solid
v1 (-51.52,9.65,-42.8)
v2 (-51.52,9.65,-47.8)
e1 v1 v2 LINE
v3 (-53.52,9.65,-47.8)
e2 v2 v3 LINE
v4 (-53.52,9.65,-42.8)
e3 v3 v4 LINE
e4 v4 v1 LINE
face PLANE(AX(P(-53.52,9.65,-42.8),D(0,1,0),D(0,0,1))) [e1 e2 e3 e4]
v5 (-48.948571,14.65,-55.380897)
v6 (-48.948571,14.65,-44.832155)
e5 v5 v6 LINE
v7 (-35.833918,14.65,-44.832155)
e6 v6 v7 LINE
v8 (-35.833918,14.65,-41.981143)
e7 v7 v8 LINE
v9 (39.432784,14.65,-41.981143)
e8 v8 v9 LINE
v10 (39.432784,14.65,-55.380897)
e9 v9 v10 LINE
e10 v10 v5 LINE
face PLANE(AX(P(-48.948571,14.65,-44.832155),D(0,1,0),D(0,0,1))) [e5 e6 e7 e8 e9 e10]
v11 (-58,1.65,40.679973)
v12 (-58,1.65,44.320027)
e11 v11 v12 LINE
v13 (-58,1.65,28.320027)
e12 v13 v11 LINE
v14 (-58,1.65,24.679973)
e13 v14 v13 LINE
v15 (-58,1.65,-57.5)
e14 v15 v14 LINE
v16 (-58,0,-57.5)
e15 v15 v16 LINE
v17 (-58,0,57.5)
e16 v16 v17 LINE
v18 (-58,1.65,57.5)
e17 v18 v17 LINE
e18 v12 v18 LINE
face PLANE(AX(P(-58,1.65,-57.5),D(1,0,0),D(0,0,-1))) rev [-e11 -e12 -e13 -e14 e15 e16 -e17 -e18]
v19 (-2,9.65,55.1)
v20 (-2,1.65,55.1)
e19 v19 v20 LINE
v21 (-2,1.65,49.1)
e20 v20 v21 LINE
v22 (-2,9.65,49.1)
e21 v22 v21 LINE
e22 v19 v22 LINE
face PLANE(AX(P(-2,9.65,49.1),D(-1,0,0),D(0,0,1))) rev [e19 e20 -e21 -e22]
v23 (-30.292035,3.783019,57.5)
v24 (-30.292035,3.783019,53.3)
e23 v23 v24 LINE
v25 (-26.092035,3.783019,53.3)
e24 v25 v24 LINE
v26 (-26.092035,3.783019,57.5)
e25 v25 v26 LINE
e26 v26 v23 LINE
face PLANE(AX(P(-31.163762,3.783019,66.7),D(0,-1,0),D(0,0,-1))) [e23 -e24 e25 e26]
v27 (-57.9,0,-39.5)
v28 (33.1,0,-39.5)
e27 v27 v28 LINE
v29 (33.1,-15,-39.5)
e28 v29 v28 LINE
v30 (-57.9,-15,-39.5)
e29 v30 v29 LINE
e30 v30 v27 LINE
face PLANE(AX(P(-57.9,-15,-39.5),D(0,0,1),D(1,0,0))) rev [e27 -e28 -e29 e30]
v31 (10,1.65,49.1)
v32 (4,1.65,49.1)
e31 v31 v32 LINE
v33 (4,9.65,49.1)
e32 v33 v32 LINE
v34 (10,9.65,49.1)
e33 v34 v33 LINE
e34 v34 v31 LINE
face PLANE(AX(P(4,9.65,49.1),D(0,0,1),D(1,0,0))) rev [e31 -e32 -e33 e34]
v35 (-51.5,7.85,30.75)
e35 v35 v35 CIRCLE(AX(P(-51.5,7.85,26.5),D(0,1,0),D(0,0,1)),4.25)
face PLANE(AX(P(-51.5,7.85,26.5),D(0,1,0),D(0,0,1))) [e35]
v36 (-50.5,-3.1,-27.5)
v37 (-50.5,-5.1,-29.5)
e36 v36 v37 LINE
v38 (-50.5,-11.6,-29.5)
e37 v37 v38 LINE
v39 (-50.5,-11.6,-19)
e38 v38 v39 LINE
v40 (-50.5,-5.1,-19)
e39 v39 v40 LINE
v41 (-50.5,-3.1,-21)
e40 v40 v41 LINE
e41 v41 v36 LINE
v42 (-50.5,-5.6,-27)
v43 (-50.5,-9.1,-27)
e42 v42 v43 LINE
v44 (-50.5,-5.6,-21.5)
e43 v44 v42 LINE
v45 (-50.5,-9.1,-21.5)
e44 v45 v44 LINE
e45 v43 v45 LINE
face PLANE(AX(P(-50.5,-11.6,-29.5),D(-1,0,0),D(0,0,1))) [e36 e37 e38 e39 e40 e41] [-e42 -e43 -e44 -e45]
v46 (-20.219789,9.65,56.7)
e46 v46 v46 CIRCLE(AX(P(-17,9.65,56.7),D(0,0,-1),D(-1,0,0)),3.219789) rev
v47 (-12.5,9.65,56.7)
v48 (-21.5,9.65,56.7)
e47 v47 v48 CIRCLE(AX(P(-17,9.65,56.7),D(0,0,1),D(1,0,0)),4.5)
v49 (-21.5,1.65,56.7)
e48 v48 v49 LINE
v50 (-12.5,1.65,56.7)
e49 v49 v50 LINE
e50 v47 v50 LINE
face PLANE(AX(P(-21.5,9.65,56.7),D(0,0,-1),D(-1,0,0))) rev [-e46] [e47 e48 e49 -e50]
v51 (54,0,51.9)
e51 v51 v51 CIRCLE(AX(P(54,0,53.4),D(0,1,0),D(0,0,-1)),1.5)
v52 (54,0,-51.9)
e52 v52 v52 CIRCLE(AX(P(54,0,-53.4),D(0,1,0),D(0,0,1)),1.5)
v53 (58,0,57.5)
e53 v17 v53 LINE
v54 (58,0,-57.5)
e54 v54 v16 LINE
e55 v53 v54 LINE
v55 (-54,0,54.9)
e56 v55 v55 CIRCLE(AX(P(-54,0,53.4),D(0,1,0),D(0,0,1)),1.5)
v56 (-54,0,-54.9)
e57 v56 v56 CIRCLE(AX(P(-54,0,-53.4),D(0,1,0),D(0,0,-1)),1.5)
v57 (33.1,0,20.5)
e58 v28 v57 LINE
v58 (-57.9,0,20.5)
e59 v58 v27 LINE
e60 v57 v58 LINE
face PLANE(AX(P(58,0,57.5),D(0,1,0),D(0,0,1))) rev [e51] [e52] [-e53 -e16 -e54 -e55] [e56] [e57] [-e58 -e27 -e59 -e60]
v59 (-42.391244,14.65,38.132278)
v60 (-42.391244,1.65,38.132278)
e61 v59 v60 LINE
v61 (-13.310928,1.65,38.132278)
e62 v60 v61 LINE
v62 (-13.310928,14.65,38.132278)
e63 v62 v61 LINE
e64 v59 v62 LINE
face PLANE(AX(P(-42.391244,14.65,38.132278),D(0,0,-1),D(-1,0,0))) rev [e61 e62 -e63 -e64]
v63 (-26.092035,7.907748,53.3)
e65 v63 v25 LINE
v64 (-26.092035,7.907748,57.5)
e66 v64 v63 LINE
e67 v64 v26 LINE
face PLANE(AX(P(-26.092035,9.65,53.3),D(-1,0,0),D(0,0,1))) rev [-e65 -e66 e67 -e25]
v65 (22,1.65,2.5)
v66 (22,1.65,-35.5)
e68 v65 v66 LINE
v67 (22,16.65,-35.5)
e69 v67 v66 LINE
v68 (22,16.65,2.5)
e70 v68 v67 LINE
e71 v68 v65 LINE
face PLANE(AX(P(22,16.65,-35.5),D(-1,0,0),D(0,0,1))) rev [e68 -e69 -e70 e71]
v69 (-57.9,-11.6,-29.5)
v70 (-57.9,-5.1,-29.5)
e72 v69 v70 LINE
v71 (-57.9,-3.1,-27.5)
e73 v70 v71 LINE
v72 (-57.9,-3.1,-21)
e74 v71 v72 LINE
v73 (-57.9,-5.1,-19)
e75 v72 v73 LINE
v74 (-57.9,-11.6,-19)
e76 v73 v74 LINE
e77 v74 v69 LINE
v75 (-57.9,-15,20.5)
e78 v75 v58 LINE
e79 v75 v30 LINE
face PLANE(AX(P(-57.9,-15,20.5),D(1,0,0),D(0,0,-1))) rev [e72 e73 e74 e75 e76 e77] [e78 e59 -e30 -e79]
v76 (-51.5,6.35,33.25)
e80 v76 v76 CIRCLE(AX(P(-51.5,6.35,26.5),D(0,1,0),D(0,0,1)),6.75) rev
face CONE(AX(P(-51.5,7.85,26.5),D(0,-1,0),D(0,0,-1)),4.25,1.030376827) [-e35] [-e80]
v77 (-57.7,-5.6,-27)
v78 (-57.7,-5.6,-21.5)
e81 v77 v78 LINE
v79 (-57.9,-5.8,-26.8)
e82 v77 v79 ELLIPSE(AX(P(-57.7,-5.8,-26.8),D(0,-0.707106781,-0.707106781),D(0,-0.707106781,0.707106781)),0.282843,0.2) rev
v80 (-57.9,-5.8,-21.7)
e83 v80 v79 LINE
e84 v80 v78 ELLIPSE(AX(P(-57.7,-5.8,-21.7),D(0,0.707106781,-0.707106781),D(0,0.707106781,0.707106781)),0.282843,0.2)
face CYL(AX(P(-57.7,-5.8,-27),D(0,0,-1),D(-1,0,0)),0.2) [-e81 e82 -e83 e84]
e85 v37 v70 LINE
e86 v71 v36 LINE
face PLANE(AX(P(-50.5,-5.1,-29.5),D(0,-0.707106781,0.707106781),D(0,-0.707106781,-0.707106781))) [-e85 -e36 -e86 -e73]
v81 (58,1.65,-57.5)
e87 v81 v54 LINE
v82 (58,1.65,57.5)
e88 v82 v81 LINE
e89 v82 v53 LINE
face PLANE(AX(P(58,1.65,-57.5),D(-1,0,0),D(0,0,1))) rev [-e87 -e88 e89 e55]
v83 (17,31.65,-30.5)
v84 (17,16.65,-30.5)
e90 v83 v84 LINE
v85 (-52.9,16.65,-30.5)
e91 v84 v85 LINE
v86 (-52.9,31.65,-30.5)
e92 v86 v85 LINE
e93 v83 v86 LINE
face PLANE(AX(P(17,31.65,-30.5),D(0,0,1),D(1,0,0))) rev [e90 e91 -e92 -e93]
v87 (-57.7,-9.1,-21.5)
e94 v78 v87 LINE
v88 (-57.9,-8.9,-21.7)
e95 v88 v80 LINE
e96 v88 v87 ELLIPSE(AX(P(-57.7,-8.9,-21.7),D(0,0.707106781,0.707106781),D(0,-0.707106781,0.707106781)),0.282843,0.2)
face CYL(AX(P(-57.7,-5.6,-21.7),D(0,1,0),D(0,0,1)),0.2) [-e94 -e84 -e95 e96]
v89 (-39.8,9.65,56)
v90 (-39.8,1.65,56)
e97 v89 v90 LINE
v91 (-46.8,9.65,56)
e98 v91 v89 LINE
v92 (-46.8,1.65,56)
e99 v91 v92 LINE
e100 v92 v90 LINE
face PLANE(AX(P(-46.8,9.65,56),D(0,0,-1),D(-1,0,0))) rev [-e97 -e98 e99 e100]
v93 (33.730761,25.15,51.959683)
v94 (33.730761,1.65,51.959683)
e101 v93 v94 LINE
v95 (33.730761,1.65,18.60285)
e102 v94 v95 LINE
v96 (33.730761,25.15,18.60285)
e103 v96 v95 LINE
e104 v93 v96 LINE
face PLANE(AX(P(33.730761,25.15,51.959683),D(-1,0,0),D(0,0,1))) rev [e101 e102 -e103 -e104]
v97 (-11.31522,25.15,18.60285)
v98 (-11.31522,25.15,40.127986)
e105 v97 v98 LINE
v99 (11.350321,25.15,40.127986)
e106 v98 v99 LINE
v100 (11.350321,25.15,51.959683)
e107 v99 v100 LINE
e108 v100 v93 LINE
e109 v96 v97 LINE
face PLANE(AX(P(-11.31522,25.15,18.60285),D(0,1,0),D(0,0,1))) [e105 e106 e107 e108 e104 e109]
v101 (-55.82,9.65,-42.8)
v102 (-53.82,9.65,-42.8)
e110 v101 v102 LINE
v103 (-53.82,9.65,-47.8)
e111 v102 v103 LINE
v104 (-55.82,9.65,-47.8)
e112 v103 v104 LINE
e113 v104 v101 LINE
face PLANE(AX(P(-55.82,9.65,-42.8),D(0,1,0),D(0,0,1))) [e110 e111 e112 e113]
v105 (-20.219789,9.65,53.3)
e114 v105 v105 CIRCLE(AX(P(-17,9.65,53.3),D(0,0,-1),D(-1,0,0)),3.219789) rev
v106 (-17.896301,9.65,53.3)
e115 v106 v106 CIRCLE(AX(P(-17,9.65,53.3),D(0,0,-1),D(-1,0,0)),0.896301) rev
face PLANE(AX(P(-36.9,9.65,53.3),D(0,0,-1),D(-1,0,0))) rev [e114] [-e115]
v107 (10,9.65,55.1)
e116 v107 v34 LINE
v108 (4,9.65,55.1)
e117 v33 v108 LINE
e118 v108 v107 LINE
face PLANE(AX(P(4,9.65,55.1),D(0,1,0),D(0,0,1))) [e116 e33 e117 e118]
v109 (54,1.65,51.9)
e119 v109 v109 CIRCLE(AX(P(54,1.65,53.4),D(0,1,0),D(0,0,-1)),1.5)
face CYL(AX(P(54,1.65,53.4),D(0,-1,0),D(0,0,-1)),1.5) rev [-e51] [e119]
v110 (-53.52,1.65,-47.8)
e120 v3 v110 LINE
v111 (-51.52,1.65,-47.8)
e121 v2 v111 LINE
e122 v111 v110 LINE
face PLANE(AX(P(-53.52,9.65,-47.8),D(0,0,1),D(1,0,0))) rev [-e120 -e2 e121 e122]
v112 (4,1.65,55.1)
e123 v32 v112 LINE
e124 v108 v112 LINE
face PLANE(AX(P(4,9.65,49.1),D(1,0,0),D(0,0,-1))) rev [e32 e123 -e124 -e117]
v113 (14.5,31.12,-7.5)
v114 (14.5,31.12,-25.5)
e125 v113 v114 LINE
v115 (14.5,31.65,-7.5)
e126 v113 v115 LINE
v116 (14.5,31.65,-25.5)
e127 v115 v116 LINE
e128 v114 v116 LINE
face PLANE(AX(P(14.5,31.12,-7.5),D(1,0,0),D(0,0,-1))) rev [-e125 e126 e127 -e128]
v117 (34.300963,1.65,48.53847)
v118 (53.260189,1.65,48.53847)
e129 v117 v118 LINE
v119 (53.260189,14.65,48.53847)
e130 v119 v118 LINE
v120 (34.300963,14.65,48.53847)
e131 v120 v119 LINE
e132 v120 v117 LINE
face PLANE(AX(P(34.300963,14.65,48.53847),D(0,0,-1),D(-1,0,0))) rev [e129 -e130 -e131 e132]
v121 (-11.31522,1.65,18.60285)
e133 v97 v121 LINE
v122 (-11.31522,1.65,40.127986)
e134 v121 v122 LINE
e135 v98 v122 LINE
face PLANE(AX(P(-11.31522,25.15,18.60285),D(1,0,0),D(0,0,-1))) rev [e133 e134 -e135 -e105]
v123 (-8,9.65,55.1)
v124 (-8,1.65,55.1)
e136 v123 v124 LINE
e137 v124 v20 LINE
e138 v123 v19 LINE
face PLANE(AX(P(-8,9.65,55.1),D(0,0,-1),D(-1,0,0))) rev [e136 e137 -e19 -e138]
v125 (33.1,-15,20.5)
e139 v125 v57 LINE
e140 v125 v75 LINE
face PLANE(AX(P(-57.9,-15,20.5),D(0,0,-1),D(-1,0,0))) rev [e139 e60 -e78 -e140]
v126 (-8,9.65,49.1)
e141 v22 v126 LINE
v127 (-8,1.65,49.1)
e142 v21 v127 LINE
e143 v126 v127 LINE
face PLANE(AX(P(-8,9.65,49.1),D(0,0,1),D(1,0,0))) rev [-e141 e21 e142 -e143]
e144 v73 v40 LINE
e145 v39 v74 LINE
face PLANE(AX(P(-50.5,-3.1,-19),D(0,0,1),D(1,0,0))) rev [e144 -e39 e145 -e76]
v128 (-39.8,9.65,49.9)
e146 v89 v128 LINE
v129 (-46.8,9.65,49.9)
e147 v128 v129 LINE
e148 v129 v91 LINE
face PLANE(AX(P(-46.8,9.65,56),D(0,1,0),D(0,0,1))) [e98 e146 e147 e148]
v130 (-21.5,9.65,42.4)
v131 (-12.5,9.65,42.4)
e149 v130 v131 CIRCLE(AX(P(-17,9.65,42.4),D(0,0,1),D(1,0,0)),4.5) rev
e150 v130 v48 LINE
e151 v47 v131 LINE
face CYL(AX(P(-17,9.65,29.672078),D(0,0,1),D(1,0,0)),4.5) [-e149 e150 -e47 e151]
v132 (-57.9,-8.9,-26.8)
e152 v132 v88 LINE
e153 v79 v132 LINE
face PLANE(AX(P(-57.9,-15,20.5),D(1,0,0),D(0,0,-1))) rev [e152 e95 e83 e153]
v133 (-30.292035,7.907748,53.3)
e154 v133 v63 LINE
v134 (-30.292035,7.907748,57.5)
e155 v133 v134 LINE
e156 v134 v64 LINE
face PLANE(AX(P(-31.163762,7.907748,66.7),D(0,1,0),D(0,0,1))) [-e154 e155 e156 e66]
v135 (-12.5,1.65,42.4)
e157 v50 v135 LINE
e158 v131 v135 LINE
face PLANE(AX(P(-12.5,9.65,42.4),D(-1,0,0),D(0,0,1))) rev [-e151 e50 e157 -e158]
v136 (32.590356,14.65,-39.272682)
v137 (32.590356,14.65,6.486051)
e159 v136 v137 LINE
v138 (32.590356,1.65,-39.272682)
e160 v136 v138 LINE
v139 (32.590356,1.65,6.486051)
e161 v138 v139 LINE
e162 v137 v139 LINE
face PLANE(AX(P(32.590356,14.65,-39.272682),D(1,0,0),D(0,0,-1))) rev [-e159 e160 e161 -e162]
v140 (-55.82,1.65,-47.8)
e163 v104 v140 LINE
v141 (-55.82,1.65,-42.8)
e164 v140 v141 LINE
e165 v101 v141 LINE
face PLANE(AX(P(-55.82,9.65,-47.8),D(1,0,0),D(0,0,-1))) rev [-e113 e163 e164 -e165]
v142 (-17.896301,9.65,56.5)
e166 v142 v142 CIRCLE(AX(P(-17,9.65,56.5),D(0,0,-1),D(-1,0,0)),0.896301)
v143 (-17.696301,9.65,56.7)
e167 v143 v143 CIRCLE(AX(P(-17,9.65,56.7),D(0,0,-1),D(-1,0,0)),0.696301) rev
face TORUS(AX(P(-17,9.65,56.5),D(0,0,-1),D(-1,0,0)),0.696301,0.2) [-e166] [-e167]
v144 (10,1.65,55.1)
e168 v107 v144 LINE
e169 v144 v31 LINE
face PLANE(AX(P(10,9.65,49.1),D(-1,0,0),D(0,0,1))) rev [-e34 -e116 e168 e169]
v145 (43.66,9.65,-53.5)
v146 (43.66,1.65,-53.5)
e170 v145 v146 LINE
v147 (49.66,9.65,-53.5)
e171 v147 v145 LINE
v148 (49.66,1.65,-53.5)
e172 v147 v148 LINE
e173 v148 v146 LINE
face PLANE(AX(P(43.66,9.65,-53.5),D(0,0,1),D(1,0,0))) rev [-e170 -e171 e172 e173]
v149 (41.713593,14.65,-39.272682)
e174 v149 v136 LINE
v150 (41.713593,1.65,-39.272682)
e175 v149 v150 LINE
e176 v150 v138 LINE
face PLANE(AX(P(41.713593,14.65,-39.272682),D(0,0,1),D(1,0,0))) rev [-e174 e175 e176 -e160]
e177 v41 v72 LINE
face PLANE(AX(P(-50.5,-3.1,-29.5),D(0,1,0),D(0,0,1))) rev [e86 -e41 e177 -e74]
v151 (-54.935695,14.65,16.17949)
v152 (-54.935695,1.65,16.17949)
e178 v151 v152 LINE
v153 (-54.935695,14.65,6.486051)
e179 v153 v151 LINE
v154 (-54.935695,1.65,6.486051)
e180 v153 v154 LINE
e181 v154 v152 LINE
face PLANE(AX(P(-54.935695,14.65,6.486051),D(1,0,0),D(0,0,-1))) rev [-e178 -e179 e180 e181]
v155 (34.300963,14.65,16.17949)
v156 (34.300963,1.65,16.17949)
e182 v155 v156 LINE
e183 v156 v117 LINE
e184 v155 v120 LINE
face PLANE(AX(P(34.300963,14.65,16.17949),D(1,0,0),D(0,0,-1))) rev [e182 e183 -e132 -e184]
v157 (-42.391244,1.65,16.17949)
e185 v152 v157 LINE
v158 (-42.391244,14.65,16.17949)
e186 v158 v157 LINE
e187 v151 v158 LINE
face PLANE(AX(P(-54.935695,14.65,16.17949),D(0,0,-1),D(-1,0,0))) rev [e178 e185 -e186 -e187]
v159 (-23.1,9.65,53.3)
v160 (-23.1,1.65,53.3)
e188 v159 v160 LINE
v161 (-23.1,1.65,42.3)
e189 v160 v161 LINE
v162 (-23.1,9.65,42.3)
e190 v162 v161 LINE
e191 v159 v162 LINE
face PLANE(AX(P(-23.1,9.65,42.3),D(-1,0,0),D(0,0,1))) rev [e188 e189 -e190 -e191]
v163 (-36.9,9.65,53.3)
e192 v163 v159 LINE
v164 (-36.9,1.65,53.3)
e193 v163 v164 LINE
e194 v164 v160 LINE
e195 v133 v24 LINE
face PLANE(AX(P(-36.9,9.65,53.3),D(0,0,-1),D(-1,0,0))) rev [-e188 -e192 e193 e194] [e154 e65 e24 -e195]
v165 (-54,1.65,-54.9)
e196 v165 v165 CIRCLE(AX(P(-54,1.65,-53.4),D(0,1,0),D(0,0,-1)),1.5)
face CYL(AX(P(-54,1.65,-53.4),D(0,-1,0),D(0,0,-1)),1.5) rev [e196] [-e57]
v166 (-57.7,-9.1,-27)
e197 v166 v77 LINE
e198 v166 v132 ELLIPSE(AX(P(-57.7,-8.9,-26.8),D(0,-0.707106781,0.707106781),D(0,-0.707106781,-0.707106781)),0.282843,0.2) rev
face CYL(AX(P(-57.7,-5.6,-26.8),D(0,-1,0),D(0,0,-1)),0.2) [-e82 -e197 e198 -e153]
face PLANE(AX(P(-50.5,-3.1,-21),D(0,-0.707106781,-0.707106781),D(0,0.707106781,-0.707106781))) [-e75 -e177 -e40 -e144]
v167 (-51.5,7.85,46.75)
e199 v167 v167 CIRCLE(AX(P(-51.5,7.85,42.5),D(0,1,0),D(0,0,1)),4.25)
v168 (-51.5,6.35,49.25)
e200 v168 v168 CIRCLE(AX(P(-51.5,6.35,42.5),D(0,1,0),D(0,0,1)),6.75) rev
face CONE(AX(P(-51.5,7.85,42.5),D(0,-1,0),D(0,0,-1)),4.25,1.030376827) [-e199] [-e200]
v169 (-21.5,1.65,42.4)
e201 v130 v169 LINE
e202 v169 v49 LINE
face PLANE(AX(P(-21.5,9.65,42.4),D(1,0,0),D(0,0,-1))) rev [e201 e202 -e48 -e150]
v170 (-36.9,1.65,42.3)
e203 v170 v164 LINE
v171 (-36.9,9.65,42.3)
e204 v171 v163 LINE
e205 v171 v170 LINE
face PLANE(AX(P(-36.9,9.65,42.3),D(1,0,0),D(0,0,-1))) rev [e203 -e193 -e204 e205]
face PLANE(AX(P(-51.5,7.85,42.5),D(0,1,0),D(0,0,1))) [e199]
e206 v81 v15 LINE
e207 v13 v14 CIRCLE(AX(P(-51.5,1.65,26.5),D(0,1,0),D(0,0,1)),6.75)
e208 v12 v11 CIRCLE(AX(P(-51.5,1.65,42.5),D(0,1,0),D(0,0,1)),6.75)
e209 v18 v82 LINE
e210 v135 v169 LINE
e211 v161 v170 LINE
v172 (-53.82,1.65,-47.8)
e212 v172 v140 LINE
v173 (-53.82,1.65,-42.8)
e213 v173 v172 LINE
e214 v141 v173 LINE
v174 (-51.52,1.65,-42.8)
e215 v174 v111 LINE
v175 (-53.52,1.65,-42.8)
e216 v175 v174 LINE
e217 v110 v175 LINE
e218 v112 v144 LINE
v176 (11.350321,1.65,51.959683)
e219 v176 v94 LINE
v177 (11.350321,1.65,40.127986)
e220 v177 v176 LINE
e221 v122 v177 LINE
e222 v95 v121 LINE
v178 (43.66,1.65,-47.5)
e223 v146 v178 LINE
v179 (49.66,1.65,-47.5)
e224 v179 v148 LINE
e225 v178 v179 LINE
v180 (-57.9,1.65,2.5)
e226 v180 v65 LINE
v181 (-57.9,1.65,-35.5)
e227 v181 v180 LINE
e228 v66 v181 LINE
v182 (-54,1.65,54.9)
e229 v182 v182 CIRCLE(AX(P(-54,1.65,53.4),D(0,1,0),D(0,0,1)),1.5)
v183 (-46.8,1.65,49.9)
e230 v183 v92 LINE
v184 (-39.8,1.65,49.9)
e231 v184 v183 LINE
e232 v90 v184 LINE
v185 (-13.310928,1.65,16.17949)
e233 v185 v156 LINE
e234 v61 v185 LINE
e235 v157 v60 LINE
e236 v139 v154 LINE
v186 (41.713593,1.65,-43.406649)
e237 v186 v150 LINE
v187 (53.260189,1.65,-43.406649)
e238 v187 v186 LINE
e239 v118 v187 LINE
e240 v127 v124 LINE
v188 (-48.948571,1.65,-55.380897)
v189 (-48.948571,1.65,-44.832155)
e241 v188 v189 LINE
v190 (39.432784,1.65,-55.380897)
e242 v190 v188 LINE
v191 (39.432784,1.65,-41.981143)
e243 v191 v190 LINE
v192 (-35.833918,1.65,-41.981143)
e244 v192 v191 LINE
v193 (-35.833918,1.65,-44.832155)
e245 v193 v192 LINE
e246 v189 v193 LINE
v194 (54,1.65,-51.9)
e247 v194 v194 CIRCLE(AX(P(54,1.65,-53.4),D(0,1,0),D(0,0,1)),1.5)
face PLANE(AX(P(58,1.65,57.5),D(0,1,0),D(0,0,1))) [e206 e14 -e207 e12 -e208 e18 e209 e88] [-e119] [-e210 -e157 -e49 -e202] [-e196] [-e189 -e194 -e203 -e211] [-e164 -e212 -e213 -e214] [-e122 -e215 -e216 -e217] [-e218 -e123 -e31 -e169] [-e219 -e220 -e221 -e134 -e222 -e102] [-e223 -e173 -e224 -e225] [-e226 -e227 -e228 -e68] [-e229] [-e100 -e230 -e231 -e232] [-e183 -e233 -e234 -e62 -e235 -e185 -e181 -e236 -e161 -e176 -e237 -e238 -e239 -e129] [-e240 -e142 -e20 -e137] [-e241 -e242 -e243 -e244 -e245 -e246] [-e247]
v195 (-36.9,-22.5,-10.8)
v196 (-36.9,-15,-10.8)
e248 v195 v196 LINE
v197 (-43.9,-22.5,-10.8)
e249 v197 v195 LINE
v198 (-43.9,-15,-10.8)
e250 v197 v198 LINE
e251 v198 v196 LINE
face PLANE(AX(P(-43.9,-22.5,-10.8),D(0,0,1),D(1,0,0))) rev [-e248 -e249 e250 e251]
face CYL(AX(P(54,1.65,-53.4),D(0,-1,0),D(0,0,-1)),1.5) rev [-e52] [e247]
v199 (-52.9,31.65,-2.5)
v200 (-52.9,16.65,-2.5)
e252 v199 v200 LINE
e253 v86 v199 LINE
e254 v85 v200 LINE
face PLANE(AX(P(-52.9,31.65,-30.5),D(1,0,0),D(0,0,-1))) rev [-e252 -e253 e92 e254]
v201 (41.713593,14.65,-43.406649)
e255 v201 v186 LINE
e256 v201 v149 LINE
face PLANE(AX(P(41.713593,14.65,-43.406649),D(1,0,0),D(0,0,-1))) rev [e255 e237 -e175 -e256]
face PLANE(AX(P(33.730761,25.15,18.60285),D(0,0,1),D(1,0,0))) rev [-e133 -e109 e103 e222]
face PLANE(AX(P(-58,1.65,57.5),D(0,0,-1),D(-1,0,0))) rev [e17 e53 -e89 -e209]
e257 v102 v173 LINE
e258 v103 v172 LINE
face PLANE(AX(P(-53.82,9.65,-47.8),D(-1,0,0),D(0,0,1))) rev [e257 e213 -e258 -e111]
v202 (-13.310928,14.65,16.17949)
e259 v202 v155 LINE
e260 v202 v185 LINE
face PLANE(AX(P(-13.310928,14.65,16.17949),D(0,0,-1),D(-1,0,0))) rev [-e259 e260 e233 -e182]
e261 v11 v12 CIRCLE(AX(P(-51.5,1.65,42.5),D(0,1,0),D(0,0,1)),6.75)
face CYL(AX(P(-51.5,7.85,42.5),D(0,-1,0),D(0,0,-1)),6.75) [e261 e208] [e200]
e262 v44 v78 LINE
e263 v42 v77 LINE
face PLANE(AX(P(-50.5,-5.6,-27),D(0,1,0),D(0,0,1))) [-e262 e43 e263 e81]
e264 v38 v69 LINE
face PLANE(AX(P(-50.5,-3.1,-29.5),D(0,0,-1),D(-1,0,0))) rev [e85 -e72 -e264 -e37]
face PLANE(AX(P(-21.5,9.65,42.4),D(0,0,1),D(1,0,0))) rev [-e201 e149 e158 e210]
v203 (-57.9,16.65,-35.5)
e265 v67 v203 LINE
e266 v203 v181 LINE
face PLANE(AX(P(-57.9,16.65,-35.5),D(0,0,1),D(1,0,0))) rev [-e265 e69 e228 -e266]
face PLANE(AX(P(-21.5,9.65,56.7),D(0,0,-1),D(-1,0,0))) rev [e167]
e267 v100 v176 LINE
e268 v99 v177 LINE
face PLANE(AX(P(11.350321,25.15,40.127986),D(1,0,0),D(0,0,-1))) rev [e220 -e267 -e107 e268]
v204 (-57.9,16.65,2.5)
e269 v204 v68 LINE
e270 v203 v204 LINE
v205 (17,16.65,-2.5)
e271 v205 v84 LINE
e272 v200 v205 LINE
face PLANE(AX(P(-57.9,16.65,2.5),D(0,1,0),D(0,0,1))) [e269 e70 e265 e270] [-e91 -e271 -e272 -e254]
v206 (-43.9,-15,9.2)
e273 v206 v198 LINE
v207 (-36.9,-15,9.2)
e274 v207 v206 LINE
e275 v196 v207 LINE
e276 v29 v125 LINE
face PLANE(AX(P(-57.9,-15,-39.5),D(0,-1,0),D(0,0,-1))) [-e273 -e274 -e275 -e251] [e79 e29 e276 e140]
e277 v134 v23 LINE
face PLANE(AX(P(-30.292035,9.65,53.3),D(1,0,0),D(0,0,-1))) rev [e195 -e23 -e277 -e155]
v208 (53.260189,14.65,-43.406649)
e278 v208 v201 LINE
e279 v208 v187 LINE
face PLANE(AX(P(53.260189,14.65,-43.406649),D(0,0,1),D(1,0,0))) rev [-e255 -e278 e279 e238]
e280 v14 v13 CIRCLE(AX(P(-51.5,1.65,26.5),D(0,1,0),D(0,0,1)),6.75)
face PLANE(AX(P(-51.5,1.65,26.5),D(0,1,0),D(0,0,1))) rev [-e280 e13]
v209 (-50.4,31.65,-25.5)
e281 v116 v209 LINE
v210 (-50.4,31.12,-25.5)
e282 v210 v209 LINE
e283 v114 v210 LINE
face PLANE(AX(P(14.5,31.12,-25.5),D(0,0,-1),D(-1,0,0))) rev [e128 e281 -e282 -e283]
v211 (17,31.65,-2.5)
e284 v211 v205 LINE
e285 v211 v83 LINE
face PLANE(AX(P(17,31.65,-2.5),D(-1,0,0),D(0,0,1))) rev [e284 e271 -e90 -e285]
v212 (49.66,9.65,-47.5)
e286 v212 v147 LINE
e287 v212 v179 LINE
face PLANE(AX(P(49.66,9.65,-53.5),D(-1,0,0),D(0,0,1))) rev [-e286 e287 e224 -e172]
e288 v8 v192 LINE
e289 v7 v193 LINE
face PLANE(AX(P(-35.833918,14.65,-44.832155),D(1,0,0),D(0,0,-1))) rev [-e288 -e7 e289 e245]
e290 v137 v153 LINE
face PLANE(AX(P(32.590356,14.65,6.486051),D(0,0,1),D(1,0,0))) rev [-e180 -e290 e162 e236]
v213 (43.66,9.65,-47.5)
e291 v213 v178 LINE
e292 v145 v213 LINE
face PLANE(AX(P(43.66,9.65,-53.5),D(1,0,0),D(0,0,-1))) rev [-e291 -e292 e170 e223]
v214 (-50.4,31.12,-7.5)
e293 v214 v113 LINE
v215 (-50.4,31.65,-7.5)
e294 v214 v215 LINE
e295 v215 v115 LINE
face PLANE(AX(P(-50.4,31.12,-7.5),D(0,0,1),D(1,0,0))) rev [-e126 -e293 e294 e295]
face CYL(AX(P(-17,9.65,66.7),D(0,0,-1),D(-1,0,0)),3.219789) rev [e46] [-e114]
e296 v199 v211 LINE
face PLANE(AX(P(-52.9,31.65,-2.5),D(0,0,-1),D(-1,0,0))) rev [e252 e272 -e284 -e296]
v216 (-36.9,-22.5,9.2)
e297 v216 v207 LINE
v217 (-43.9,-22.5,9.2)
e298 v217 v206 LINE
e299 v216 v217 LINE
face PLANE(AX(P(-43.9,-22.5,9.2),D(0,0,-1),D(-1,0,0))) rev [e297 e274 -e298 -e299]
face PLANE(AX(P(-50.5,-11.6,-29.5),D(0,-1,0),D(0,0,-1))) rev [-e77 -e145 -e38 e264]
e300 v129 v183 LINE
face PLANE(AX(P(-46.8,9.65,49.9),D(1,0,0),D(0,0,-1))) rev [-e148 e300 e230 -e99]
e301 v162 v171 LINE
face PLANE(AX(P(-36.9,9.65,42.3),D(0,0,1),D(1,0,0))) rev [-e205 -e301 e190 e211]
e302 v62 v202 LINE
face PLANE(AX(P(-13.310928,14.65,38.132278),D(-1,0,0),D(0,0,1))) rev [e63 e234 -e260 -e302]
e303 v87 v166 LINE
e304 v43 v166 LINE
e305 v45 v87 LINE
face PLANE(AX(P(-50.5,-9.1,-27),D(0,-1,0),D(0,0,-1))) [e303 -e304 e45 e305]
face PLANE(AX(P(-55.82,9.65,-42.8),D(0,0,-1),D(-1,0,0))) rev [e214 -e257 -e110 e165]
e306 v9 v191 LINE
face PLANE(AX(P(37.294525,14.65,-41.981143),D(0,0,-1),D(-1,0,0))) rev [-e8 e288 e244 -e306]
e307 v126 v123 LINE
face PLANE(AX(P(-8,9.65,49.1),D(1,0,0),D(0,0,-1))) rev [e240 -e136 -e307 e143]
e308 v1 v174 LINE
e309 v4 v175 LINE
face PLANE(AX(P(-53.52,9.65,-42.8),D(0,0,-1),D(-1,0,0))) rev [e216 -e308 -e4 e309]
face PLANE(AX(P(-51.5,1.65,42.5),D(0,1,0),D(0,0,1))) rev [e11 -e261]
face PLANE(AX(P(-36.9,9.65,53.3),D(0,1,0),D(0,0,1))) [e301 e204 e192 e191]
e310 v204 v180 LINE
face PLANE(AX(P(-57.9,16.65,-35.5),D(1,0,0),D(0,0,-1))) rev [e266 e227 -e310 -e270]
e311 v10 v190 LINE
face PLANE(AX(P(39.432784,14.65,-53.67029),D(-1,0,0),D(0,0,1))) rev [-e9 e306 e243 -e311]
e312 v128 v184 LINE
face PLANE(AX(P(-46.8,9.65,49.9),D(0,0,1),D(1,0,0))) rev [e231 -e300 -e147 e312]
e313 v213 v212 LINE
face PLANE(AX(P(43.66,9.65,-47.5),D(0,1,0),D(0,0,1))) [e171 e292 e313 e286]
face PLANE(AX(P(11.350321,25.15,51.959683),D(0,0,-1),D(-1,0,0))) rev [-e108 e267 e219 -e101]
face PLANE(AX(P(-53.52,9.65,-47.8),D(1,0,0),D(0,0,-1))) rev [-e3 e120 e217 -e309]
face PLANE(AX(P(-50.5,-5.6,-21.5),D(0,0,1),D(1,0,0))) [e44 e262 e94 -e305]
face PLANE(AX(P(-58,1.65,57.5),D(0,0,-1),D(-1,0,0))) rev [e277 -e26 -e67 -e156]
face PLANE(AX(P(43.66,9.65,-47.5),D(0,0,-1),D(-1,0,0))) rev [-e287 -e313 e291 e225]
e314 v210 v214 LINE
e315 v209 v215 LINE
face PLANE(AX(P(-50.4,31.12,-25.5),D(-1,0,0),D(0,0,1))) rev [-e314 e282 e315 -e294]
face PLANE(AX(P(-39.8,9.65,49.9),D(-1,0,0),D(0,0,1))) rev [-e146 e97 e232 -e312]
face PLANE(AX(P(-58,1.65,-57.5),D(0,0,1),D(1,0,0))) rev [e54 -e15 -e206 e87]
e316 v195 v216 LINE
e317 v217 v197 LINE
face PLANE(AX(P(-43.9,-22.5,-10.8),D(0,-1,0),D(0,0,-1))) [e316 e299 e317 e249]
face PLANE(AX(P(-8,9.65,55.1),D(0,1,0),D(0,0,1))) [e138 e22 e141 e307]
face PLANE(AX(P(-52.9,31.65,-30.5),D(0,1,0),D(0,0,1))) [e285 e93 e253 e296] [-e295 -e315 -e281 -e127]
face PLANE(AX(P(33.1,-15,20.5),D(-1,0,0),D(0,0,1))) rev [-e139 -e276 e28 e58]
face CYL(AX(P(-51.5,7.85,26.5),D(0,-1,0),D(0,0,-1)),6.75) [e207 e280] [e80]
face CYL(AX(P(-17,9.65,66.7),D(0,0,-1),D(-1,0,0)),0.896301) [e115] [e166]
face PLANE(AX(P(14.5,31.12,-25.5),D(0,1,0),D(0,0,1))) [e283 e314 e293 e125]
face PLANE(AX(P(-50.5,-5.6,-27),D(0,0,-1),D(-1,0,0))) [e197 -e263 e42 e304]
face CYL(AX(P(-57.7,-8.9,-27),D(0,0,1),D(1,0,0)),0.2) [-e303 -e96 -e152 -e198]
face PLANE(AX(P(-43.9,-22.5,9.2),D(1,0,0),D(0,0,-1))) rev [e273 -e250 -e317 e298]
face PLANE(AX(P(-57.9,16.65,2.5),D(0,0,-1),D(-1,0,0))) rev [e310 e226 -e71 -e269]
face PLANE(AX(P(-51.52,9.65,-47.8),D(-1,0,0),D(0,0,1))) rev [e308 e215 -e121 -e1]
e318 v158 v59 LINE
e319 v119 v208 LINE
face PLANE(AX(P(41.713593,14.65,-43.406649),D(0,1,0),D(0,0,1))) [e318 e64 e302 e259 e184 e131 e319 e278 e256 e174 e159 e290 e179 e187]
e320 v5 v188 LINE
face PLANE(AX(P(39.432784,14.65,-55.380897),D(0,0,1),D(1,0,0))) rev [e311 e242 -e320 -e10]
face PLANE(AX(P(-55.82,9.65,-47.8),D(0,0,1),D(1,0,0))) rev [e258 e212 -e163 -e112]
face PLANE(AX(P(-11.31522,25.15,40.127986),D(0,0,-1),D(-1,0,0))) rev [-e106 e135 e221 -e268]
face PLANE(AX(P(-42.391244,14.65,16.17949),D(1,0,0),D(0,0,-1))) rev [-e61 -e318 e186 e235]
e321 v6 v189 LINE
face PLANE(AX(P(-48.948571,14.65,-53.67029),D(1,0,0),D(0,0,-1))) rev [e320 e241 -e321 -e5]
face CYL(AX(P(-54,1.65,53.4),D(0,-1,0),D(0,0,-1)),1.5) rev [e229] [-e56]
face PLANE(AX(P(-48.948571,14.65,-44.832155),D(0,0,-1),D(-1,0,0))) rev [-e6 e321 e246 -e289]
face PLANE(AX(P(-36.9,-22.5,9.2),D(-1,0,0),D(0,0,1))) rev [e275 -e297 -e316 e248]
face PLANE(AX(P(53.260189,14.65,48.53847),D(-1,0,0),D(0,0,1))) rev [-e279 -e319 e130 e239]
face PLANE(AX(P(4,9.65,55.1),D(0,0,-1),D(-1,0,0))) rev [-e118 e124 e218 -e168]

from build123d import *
from OCP.BRepFilletAPI import BRepFilletAPI_MakeChamfer

# Parameters (mm, degrees)
SKETCH1_W              = 116
SKETCH1_H              = 115
SKETCH1_R              = 1.5
BASE_FLANGE1_DEPTH     = 1.65
SKETCH3_W              = 79.9
SKETCH3_H              = 38
EXTRUDE1_DEPTH         = 15
SKETCH4_W              = 69.9
SKETCH4_H              = 28
EXTRUDE2_DEPTH         = 15
SKETCH6_W              = 64.9
SKETCH6_H              = 18
DISPLAY_DEPTH          = 0.53
SKETCH7_W              = 91
SKETCH7_H              = 60
WIRING_BOARD_DEPTH     = 15
SKETCH8_W              = 7
SKETCH8_H              = 20
EXTRUDE5_DEPTH         = 7.5
SKETCH9_W              = 10.5
SKETCH9_H              = 8.5
SKETCH9_W_2            = 5.5
SKETCH9_H_2            = 3.5
USB_DEPTH              = 7.5
CHAMFER1_SIZE          = 2
SKETCH10_R             = 6.75
POTENTIOMETERS_DEPTH   = 6.2
SKETCH11_W             = 7
SKETCH11_H             = 6.1
SKETCH11_W_2           = 9
SKETCH11_H_2           = 14.3
SKETCH11_W_3           = 6
SKETCH11_H_3           = 6
SKETCH11_W_4           = 2
SKETCH11_H_4           = 5
KEEP_ACCESSIBLE_DEPTH  = 8
EXTRUDE9_DEPTH         = 13
HOT_VOLTAGE_REGS_DEPTH = 23.5
SKETCH14_R             = 4.5
EXTRUDE10_DEPTH        = 14.3
EXTRUDE11_DEPTH        = 10
EXTRUDE11_DEPTH_BACK   = 3.4
SKETCH15_R             = 3.219788924
SKETCH15_R_2           = 0.896300673
SKETCH15_W             = 5.949829442
SKETCH15_H             = 2.638553101
SKETCH15_H_2           = 2.133019186
FILLET1_R              = 0.2
CHAMFER2_SIZE          = 1.5
CHAMFER2_SIZE2         = 2.5


# Sheet-metal steps are written as plain solids
with BuildPart() as part:
    # Sketch1 → Base-Flange1 (new body)
    with BuildSketch(Plane(origin=(0, 0, 0), x_dir=(1, 0, 0), z_dir=(0, 1, 0))):
        Rectangle(SKETCH1_W, SKETCH1_H)
        with Locations(Location((54, 53.4, 0), (0, 0, 270))):
            Circle(SKETCH1_R, mode=Mode.SUBTRACT)
        with Locations(Location((54, -53.4, 0), (0, 0, 90))):
            Circle(SKETCH1_R, mode=Mode.SUBTRACT)
        with Locations(Location((-54, 53.4, 0), (0, 0, 90))):
            Circle(SKETCH1_R, mode=Mode.SUBTRACT)
        with Locations(Location((-54, -53.4, 0), (0, 0, 270))):
            Circle(SKETCH1_R, mode=Mode.SUBTRACT)
    extrude(amount=BASE_FLANGE1_DEPTH)

    # Sketch3 → Extrude1 (add)
    with BuildSketch(Plane(origin=(0, 1.65, 0), x_dir=(1, 0, 0), z_dir=(0, 1, 0))):
        with Locations((-17.95, 16.5)):
            Rectangle(SKETCH3_W, SKETCH3_H)
    extrude(amount=EXTRUDE1_DEPTH)

    # Sketch4 → Extrude2 (add)
    with BuildSketch(Plane(origin=(0, 16.65, 0), x_dir=(1, 0, 0), z_dir=(0, 1, 0))):
        with Locations((-17.95, 16.5)):
            Rectangle(SKETCH4_W, SKETCH4_H)
    extrude(amount=EXTRUDE2_DEPTH)

    # Sketch6 → Display! (cut)
    with BuildSketch(Plane(origin=(0, 31.65, 0), x_dir=(1, 0, 0), z_dir=(0, 1, 0))):
        with Locations((-17.95, 16.5)):
            Rectangle(SKETCH6_W, SKETCH6_H)
    extrude(amount=-DISPLAY_DEPTH, mode=Mode.SUBTRACT)

    # Sketch7 → Wiring Board (add)
    with BuildSketch(Plane.XZ):
        with Locations((-12.4, -9.5)):
            Rectangle(SKETCH7_W, SKETCH7_H)
    extrude(amount=WIRING_BOARD_DEPTH)

    # Sketch8 → Extrude5 (add)
    with BuildSketch(Plane.XZ.offset(15)):
        with Locations((-40.4, -0.8)):
            Rectangle(SKETCH8_W, SKETCH8_H)
    extrude(amount=EXTRUDE5_DEPTH)

    # Sketch9 → USB (cut)
    with BuildSketch(Plane.ZY.offset(58)):
        with Locations((-24.25, -7.35)):
            Rectangle(SKETCH9_W, SKETCH9_H)
        with Locations((-24.25, -7.35)):
            Rectangle(SKETCH9_W_2, SKETCH9_H_2, mode=Mode.SUBTRACT)
    extrude(amount=-USB_DEPTH, mode=Mode.SUBTRACT)

    # Chamfer1
    chamfer1_edges = [part.edges().sort_by_distance(p)[0] for p in [
        (-54.2, -3.1, -19),
        (-54.2, -3.1, -29.5),
    ]]
    chamfer(chamfer1_edges, length=CHAMFER1_SIZE)

    # Sketch10 → Potentiometers (add)
    with BuildSketch(Plane(origin=(0, 1.65, 0), x_dir=(1, 0, 0), z_dir=(0, 1, 0))):
        with Locations(Location((-51.5, -26.5, 0), (0, 0, 164.357528987))):
            Circle(SKETCH10_R)
        with Locations(Location((-51.5, -42.5, 0), (0, 0, 164.357528987))):
            Circle(SKETCH10_R)
    extrude(amount=POTENTIOMETERS_DEPTH)

    # Sketch11 → Keep Accessible!! (add)
    with BuildSketch(Plane(origin=(0, 1.65, 0), x_dir=(1, 0, 0), z_dir=(0, 1, 0))):
        Polygon((-26.092034571, -53.3), (-23.1, -53.3), (-23.1, -42.3), (-36.9, -42.3), (-36.9, -53.3), (-30.292034571, -53.3), (-30.292034571, -57.5), (-26.092034571, -57.5), align=None)
        with Locations((-43.3, -52.95)):
            Rectangle(SKETCH11_W, SKETCH11_H)
        with Locations((-17, -49.55)):
            Rectangle(SKETCH11_W_2, SKETCH11_H_2)
        with Locations((-5, -52.1)):
            Rectangle(SKETCH11_W_3, SKETCH11_H_3)
        with Locations((7, -52.1)):
            Rectangle(SKETCH11_W_3, SKETCH11_H_3)
        with Locations((46.66, 50.5)):
            Rectangle(SKETCH11_W_3, SKETCH11_H_3)
        with Locations((-54.82, 45.3)):
            Rectangle(SKETCH11_W_4, SKETCH11_H_4)
        with Locations((-52.52, 45.3)):
            Rectangle(SKETCH11_W_4, SKETCH11_H_4)
    extrude(amount=KEEP_ACCESSIBLE_DEPTH)

    # Sketch12 → Extrude9 (add)
    with BuildSketch(Plane(origin=(0, 1.65, 0), x_dir=(1, 0, 0), z_dir=(0, 1, 0))):
        Polygon((-48.948570669, 53.670290093), (-48.948570669, 44.832154672), (-35.833918109, 44.832154672), (-35.833918109, 41.981143246), (37.294524965, 41.981143246), (39.432783534, 41.981143246), (39.432783534, 53.670290093), (39.432783534, 55.380896948), (-48.948570669, 55.380896948), align=None)
        Polygon((41.713592675, 43.406648959), (41.713592675, 39.272682392), (32.590356112, 39.272682392), (32.590356112, -6.486050994), (-54.935694663, -6.486050994), (-54.935694663, -16.179489842), (-42.391244389, -16.179489842), (-42.391244389, -38.132277821), (-13.310927845, -38.132277821), (-13.310927845, -16.179489842), (34.300962968, -16.179489842), (34.300962968, -48.538469526), (53.26018895, -48.538469526), (53.26018895, 43.406648959), align=None)
    extrude(amount=EXTRUDE9_DEPTH)

    # Sketch13 → Hot! Voltage Regs (add)
    with BuildSketch(Plane(origin=(0, 1.65, 0), x_dir=(1, 0, 0), z_dir=(0, 1, 0))):
        Polygon((-11.315219847, -18.602849554), (-11.315219847, -40.12798582), (11.350320989, -40.12798582), (11.350320989, -51.959683237), (33.730760683, -51.959683237), (33.730760683, -18.602849554), align=None)
    extrude(amount=HOT_VOLTAGE_REGS_DEPTH)

    # Sketch14 → Extrude10 (add)
    with BuildSketch(Plane.XY.offset(56.7)):
        with Locations((-17, 9.65)):
            Circle(SKETCH14_R)
    extrude(amount=-EXTRUDE10_DEPTH)

    # Sketch15 → Extrude11 (cut, two sides: drawn at the far end of the back side and taken through both)
    # profile 1 of 3: a face of its own
    with BuildSketch(Plane.XY.offset(56.7).offset(-EXTRUDE11_DEPTH_BACK)):
        with Locations(Location((-17, 9.65, 0), (0, 0, 180))):
            Circle(SKETCH15_R)
        with Locations(Location((-17, 9.65, 0), (0, 0, 180))):
            Circle(SKETCH15_R_2, mode=Mode.SUBTRACT)
    # profile 2 of 3: a face of its own
    with BuildSketch(Plane.XY.offset(56.7).offset(-EXTRUDE11_DEPTH_BACK)):
        with Locations((-28.188847243, 9.227024123)):
            Rectangle(SKETCH15_W, SKETCH15_H)
    # profile 3 of 3: a face of its own
    with BuildSketch(Plane.XY.offset(56.7).offset(-EXTRUDE11_DEPTH_BACK)):
        with Locations((-28.188847243, 2.716509593)):
            Rectangle(SKETCH15_W, SKETCH15_H_2)
    extrude(amount=EXTRUDE11_DEPTH + EXTRUDE11_DEPTH_BACK, mode=Mode.SUBTRACT)

    # Fillet1
    fillet1_edges = [part.edges().sort_by_distance(p)[0] for p in [
        (-16.103699327, 9.65, 56.7),
        (-57.9, -9.1, -24.25),
        (-57.9, -7.35, -21.5),
        (-57.9, -5.6, -24.25),
        (-57.9, -7.35, -27),
    ]]
    fillet(fillet1_edges, radius=FILLET1_R)

    # Chamfer2: one chamfer whose edges measure the first distance from different faces: ONE call of the kernel's chamfer builder (chamfer() names one face for all edges)
    chamfer2_edges_1 = [part.edges().sort_by_distance(p)[0] for p in [
        (-45, 7.85, 28.320027472),
    ]]
    chamfer2_side_1 = [part.faces().sort_by_distance(p)[0] for p in [
        (-45, 4.75, 28.320027472),
    ]]
    chamfer2_edges_2 = [part.edges().sort_by_distance(p)[0] for p in [
        (-45, 7.85, 44.320027472),
    ]]
    chamfer2_side_2 = [part.faces().sort_by_distance(p)[0] for p in [
        (-45, 4.75, 44.320027472),
    ]]
    chamfer2 = BRepFilletAPI_MakeChamfer(part.part.solid().wrapped)
    for e in chamfer2_edges_1:
        chamfer2.Add(CHAMFER2_SIZE, CHAMFER2_SIZE2, e.wrapped, chamfer2_side_1[0].wrapped)  # the first distance lies on this face
    for e in chamfer2_edges_2:
        chamfer2.Add(CHAMFER2_SIZE, CHAMFER2_SIZE2, e.wrapped, chamfer2_side_2[0].wrapped)  # the first distance lies on this face
    add(Compound.cast(chamfer2.Shape()), mode=Mode.REPLACE)


solid = part.part
